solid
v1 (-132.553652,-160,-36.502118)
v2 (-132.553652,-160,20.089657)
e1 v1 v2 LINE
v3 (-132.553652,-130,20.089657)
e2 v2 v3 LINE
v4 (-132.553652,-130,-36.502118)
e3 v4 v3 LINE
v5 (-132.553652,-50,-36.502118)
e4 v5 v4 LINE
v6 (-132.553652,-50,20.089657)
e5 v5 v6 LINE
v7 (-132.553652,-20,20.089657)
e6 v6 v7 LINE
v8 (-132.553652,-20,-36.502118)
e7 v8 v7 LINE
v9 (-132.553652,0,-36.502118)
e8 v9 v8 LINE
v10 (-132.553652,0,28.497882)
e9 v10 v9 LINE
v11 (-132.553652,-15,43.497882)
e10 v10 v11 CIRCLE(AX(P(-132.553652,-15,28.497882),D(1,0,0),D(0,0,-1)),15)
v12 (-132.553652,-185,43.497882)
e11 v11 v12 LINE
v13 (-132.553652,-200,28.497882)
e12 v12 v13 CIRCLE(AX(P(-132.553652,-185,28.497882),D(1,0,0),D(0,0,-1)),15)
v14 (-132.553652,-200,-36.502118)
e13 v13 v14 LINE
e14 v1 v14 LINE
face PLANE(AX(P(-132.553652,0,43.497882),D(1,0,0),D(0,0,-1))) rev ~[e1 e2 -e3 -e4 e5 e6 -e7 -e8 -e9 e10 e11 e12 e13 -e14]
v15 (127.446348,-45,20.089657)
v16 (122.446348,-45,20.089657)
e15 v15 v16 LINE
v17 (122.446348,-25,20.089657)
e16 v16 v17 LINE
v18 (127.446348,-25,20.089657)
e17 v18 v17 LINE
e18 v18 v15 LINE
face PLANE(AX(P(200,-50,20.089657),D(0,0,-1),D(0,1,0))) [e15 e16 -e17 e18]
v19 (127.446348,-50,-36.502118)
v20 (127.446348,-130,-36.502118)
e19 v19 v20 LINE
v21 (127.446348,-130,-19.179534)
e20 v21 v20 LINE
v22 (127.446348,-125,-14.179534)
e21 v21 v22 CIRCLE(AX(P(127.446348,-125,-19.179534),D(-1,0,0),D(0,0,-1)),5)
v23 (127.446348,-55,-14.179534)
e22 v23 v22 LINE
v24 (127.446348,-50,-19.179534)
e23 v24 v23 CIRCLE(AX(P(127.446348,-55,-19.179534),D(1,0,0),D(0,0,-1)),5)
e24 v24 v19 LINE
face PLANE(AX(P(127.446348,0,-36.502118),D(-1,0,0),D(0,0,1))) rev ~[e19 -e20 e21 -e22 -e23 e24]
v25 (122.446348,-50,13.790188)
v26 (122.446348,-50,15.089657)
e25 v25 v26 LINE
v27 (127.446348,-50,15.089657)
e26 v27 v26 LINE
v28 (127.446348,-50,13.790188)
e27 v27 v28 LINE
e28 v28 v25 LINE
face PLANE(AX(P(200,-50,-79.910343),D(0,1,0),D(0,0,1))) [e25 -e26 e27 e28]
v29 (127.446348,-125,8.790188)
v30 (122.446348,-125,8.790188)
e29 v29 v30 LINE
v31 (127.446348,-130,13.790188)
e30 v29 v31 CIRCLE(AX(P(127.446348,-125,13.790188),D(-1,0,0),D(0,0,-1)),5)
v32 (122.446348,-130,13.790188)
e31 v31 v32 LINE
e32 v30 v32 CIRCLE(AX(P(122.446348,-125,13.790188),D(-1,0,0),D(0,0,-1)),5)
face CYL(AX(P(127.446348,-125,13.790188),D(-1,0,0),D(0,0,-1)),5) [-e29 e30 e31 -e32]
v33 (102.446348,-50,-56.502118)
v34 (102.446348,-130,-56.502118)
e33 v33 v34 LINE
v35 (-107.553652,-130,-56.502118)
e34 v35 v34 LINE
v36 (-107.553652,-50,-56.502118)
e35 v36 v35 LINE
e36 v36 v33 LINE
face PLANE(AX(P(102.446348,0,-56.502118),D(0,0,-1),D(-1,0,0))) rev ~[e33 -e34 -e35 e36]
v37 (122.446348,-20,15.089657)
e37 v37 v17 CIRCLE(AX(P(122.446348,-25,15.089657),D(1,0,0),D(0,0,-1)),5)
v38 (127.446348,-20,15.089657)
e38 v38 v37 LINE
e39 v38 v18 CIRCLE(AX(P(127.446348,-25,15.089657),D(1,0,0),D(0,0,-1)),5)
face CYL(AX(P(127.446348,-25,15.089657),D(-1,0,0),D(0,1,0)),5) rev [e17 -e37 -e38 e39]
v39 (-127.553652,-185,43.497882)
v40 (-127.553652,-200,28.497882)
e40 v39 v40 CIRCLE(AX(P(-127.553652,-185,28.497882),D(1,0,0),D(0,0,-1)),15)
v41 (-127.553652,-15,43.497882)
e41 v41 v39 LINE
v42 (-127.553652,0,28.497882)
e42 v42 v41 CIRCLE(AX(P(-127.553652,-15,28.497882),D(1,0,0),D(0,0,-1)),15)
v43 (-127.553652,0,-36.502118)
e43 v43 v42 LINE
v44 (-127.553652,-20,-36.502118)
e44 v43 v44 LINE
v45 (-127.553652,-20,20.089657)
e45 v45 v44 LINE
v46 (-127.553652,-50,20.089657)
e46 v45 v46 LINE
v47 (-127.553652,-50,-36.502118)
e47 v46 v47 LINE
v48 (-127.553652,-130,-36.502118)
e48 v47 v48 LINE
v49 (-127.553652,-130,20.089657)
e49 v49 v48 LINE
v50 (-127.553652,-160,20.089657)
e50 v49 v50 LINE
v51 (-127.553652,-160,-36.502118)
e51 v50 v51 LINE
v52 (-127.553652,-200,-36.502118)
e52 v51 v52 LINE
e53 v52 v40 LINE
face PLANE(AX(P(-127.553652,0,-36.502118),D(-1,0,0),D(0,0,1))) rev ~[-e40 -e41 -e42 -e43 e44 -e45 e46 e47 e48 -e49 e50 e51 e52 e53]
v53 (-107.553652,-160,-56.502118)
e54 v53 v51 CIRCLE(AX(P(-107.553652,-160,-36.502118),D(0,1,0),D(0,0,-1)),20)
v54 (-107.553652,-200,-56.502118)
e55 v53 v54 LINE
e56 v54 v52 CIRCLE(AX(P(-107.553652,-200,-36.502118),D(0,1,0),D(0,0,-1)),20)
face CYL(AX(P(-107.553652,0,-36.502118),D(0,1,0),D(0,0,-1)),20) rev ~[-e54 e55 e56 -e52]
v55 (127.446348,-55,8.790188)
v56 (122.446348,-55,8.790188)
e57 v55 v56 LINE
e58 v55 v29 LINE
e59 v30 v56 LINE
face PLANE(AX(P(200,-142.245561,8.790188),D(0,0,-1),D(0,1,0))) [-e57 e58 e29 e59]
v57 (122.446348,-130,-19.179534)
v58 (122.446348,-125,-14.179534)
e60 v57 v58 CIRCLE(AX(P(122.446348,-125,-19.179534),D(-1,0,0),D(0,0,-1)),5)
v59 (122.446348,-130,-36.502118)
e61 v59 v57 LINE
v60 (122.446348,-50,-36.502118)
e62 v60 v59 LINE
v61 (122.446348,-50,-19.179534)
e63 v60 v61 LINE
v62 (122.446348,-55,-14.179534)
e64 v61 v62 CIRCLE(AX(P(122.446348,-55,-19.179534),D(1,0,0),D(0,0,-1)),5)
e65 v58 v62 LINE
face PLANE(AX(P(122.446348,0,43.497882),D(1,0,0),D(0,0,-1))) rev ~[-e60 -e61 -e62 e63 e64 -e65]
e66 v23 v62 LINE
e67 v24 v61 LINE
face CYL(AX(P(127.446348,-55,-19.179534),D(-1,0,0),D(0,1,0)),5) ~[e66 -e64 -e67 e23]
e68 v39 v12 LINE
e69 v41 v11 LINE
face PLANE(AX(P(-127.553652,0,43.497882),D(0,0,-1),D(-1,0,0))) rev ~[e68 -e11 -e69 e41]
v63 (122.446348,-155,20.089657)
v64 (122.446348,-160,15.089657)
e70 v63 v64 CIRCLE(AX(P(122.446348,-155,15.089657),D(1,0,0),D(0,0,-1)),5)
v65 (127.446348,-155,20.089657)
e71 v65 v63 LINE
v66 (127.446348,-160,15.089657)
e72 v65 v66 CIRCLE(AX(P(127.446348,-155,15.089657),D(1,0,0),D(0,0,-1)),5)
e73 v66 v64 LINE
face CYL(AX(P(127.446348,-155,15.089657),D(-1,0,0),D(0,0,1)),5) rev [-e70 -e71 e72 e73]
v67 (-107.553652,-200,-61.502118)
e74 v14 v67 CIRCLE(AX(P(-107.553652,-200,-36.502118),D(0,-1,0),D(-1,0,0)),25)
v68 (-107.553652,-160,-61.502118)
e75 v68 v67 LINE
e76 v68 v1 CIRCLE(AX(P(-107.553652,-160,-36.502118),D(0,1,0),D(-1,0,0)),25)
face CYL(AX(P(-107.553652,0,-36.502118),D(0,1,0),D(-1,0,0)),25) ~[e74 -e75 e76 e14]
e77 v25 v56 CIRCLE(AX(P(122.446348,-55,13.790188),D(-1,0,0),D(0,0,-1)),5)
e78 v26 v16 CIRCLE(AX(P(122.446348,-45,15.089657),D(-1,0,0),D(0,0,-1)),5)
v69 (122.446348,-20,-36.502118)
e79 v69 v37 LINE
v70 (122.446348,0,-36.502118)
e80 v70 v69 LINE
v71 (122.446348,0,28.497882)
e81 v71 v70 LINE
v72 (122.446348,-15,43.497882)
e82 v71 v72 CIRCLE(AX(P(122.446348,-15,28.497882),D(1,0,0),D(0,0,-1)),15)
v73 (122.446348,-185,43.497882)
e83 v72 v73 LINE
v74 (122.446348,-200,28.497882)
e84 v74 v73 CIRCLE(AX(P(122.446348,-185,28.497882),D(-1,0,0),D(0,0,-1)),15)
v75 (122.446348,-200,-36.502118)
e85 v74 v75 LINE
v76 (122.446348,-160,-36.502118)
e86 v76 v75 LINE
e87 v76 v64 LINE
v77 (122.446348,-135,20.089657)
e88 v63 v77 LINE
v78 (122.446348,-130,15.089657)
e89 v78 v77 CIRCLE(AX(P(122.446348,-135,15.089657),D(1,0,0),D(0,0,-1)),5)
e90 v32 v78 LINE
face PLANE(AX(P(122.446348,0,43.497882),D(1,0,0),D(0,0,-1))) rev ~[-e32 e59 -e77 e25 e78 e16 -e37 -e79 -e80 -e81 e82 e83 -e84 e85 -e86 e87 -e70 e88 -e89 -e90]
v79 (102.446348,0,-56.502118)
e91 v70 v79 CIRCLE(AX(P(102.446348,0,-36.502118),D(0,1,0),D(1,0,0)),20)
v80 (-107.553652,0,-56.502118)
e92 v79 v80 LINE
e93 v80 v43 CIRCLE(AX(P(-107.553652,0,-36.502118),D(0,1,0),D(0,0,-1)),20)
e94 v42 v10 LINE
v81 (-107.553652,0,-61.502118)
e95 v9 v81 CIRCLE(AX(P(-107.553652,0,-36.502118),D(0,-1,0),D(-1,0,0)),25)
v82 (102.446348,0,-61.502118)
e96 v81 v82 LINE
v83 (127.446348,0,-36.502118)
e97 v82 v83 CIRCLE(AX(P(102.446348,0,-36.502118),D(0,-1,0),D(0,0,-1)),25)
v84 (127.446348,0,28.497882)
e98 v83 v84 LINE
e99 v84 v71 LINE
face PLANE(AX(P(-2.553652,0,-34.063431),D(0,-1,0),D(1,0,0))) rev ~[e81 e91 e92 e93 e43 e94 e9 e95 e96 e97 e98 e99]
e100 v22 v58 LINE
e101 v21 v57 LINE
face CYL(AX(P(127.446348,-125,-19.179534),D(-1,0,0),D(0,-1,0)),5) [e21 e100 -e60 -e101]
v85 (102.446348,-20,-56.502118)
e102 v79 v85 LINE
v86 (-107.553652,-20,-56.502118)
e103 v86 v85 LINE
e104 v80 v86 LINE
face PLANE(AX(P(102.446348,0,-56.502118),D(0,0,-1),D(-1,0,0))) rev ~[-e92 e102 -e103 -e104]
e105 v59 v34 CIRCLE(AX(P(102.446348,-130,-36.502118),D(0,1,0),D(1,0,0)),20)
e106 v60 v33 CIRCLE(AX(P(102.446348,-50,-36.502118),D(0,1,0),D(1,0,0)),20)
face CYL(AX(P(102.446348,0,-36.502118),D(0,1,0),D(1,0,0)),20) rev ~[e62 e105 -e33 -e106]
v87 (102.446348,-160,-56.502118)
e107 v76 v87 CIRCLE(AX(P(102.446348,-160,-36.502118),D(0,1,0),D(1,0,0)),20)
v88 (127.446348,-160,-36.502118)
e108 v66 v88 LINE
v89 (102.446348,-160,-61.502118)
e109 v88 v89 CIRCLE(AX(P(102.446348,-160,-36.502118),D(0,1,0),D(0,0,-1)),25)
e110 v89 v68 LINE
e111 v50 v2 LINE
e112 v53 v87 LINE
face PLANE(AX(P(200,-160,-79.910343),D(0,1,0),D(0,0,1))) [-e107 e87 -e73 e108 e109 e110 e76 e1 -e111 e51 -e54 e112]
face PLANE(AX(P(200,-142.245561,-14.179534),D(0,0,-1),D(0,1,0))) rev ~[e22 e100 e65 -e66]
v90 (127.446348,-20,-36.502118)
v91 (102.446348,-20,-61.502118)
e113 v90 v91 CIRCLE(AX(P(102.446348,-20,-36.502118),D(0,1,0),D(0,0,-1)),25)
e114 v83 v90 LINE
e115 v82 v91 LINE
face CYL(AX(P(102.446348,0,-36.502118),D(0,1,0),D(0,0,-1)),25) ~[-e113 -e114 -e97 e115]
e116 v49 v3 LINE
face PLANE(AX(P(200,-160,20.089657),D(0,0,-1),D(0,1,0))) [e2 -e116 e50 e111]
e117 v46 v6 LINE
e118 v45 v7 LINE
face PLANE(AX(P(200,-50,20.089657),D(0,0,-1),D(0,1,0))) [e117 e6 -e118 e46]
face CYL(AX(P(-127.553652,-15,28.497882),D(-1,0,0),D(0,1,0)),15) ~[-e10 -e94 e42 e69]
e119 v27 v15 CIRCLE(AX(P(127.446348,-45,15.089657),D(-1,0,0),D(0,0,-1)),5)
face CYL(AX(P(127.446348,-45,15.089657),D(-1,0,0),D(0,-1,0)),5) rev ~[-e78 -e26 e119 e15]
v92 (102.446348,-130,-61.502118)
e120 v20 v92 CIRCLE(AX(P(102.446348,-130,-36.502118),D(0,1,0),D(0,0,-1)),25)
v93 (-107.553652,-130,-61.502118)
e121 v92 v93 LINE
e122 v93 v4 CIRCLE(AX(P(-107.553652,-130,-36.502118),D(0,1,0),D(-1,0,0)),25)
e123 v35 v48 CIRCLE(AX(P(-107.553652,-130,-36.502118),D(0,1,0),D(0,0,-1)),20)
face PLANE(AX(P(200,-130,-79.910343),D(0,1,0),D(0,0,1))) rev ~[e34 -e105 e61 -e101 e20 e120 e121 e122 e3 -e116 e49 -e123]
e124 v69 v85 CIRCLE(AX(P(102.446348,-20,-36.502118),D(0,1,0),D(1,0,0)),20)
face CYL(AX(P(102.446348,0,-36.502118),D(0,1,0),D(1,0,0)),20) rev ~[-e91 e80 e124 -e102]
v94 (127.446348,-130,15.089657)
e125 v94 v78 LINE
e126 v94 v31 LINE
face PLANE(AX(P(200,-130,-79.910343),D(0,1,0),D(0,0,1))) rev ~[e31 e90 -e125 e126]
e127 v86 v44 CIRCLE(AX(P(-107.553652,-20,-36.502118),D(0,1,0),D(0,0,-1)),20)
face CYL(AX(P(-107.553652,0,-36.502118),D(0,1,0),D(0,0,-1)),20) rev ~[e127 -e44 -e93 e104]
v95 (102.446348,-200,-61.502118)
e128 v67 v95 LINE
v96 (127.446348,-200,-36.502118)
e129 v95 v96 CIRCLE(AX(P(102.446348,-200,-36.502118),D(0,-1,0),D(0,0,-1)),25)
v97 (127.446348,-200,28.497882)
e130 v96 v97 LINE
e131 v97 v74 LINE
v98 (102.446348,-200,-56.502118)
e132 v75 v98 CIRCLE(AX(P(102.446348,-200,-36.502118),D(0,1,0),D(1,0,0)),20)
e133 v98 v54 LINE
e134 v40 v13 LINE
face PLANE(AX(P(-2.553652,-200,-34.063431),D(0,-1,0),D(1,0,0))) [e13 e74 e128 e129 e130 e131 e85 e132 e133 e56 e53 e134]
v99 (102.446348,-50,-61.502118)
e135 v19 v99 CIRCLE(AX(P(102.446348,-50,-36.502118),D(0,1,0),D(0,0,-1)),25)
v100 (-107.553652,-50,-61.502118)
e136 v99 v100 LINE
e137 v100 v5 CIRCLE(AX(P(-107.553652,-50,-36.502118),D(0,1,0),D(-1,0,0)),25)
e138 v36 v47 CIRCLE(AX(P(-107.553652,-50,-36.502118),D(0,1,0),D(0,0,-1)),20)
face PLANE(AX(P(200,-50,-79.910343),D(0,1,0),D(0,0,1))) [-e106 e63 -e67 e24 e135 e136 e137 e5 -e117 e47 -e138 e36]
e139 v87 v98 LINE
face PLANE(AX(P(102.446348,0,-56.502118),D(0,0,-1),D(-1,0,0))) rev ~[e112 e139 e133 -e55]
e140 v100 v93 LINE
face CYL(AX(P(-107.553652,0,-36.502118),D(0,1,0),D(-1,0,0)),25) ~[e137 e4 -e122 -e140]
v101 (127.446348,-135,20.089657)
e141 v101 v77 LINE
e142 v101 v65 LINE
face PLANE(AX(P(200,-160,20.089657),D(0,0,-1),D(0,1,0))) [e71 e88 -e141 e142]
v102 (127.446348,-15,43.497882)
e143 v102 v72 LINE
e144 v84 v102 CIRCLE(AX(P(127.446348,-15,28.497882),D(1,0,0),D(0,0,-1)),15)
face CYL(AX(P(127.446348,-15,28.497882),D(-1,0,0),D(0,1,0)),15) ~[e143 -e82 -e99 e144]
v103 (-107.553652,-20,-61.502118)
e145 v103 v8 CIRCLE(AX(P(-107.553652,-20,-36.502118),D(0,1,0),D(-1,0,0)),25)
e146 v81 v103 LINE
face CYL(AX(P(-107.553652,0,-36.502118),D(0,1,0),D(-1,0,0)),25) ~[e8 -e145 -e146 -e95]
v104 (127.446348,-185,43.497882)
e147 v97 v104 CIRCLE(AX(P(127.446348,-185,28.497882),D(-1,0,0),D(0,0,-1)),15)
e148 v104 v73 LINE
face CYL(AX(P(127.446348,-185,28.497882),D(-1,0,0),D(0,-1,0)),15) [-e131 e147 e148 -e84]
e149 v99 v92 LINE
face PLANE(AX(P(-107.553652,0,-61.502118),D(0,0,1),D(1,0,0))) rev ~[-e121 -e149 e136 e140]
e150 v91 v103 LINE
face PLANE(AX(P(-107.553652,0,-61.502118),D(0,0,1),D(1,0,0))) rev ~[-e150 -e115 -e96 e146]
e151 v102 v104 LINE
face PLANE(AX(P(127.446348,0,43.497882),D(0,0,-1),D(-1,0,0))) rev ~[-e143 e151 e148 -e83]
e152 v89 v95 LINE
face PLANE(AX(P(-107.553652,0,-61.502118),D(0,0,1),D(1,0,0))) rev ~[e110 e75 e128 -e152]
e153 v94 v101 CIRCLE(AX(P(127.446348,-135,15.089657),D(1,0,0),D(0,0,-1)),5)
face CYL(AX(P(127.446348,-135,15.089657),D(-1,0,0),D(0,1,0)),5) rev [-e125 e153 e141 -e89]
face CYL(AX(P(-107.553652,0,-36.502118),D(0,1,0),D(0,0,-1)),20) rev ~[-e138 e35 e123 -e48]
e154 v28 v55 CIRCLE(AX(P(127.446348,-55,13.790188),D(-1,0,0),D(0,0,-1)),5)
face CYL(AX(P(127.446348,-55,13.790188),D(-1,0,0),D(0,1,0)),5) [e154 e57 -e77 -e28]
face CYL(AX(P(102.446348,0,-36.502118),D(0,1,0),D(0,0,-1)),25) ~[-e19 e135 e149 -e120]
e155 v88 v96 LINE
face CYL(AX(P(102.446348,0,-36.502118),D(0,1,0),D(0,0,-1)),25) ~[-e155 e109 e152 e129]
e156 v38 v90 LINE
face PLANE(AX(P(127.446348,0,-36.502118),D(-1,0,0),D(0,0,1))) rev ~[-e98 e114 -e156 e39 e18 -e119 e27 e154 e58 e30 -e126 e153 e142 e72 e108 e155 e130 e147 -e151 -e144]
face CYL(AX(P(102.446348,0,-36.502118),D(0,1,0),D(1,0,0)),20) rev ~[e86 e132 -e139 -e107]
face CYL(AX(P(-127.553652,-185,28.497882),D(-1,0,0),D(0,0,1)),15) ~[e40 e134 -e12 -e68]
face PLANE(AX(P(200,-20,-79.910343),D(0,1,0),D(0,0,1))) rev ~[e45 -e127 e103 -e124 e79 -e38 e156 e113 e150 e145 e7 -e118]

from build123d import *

# Parameters (mm, degrees)
F2_DEPTH = 200
F3_W     = 30
F3_H     = 100
F4_DEPTH = 500
F6_R     = 15
F7_R     = 5
F8_W     = 101.1056527495
F8_H     = 22.9697218165
F9_DEPTH = 200
F10_R    = 5


with BuildPart() as f2:
    # F0 (on Front) → F2 (new body)
    with BuildSketch(Plane.XZ):
        with BuildLine():
            Line((-127.5536519289, -36.5021181107), (-127.5536519289, 43.4978818893))
            Line((-127.5536519289, 43.4978818893), (-132.5536519289, 43.4978818893))
            Line((-132.5536519289, 43.4978818893), (-132.5536519289, -36.5021181107))
            ThreePointArc((-132.5536519289, -36.5021181107), (-125.2313214586, -54.1797876403), (-107.5536519289, -61.5021181107))
            Line((-107.5536519289, -61.5021181107), (102.4463480711, -61.5021181107))
            ThreePointArc((102.4463480711, -61.5021181107), (120.1240176008, -54.1797876403), (127.4463480711, -36.5021181107))
            Line((127.4463480711, -36.5021181107), (127.4463480711, 43.4978818893))
            Line((127.4463480711, 43.4978818893), (122.4463480711, 43.4978818893))
            Line((122.4463480711, 43.4978818893), (122.4463480711, -36.5021181107))
            ThreePointArc((122.4463480711, -36.5021181107), (116.5884836948, -50.6442537344), (102.4463480711, -56.5021181107))
            Line((102.4463480711, -56.5021181107), (-107.5536519289, -56.5021181107))
            ThreePointArc((-107.5536519289, -56.5021181107), (-121.6957875526, -50.6442537344), (-127.5536519289, -36.5021181107))
        make_face()
    extrude(amount=F2_DEPTH)


with BuildPart() as f4:
    # F3 (on offset) → F4 (new body)
    with BuildSketch(Plane.YZ.offset(200)):
        with Locations((-145, -29.9103426556)):
            Rectangle(F3_W, F3_H)
    extrude(amount=-F4_DEPTH)


with BuildPart() as f4b:
    # F3 (on offset) → F4, piece 2 (new body)
    with BuildSketch(Plane.YZ.offset(200)):
        with Locations((-35, -29.9103426556)):
            Rectangle(F3_W, F3_H)
    extrude(amount=-F4_DEPTH)


with BuildPart() as f2_1:
    add(f2.part)

    # F5: cut F4, F4b
    add(f4.part, mode=Mode.SUBTRACT)
    add(f4b.part, mode=Mode.SUBTRACT)

    # F6
    f6_edges = [f2_1.edges().sort_by_distance(p)[0] for p in [
        (-130.053652, -200, 43.497882),
        (-130.053652, 0, 43.497882),
        (124.946348, -200, 43.497882),
        (124.946348, 0, 43.497882),
    ]]
    fillet(f6_edges, radius=F6_R)

    # F7
    f7_edges = [f2_1.edges().sort_by_distance(p)[0] for p in [
        (124.946348, -20, 20.089657),
        (124.946348, -50, 20.089657),
    ]]
    fillet(f7_edges, radius=F7_R)

    # F8 (on offset) → F9 (cut)
    with BuildSketch(Plane.YZ.offset(200)):
        with Locations((-91.6927345097, -2.6946733706)):
            Rectangle(F8_W, F8_H)
    extrude(amount=-F9_DEPTH, mode=Mode.SUBTRACT)

    # F10
    f10_edges = [f2_1.edges().sort_by_distance(p)[0] for p in [
        (124.946348, -50, -14.179534),
        (124.946348, -50, 8.790188),
        (124.946348, -130, 8.790188),
        (124.946348, -130, -14.179534),
        (124.946348, -130, 20.089657),
        (124.946348, -160, 20.089657),
    ]]
    fillet(f10_edges, radius=F10_R)


solid = f2_1.part
